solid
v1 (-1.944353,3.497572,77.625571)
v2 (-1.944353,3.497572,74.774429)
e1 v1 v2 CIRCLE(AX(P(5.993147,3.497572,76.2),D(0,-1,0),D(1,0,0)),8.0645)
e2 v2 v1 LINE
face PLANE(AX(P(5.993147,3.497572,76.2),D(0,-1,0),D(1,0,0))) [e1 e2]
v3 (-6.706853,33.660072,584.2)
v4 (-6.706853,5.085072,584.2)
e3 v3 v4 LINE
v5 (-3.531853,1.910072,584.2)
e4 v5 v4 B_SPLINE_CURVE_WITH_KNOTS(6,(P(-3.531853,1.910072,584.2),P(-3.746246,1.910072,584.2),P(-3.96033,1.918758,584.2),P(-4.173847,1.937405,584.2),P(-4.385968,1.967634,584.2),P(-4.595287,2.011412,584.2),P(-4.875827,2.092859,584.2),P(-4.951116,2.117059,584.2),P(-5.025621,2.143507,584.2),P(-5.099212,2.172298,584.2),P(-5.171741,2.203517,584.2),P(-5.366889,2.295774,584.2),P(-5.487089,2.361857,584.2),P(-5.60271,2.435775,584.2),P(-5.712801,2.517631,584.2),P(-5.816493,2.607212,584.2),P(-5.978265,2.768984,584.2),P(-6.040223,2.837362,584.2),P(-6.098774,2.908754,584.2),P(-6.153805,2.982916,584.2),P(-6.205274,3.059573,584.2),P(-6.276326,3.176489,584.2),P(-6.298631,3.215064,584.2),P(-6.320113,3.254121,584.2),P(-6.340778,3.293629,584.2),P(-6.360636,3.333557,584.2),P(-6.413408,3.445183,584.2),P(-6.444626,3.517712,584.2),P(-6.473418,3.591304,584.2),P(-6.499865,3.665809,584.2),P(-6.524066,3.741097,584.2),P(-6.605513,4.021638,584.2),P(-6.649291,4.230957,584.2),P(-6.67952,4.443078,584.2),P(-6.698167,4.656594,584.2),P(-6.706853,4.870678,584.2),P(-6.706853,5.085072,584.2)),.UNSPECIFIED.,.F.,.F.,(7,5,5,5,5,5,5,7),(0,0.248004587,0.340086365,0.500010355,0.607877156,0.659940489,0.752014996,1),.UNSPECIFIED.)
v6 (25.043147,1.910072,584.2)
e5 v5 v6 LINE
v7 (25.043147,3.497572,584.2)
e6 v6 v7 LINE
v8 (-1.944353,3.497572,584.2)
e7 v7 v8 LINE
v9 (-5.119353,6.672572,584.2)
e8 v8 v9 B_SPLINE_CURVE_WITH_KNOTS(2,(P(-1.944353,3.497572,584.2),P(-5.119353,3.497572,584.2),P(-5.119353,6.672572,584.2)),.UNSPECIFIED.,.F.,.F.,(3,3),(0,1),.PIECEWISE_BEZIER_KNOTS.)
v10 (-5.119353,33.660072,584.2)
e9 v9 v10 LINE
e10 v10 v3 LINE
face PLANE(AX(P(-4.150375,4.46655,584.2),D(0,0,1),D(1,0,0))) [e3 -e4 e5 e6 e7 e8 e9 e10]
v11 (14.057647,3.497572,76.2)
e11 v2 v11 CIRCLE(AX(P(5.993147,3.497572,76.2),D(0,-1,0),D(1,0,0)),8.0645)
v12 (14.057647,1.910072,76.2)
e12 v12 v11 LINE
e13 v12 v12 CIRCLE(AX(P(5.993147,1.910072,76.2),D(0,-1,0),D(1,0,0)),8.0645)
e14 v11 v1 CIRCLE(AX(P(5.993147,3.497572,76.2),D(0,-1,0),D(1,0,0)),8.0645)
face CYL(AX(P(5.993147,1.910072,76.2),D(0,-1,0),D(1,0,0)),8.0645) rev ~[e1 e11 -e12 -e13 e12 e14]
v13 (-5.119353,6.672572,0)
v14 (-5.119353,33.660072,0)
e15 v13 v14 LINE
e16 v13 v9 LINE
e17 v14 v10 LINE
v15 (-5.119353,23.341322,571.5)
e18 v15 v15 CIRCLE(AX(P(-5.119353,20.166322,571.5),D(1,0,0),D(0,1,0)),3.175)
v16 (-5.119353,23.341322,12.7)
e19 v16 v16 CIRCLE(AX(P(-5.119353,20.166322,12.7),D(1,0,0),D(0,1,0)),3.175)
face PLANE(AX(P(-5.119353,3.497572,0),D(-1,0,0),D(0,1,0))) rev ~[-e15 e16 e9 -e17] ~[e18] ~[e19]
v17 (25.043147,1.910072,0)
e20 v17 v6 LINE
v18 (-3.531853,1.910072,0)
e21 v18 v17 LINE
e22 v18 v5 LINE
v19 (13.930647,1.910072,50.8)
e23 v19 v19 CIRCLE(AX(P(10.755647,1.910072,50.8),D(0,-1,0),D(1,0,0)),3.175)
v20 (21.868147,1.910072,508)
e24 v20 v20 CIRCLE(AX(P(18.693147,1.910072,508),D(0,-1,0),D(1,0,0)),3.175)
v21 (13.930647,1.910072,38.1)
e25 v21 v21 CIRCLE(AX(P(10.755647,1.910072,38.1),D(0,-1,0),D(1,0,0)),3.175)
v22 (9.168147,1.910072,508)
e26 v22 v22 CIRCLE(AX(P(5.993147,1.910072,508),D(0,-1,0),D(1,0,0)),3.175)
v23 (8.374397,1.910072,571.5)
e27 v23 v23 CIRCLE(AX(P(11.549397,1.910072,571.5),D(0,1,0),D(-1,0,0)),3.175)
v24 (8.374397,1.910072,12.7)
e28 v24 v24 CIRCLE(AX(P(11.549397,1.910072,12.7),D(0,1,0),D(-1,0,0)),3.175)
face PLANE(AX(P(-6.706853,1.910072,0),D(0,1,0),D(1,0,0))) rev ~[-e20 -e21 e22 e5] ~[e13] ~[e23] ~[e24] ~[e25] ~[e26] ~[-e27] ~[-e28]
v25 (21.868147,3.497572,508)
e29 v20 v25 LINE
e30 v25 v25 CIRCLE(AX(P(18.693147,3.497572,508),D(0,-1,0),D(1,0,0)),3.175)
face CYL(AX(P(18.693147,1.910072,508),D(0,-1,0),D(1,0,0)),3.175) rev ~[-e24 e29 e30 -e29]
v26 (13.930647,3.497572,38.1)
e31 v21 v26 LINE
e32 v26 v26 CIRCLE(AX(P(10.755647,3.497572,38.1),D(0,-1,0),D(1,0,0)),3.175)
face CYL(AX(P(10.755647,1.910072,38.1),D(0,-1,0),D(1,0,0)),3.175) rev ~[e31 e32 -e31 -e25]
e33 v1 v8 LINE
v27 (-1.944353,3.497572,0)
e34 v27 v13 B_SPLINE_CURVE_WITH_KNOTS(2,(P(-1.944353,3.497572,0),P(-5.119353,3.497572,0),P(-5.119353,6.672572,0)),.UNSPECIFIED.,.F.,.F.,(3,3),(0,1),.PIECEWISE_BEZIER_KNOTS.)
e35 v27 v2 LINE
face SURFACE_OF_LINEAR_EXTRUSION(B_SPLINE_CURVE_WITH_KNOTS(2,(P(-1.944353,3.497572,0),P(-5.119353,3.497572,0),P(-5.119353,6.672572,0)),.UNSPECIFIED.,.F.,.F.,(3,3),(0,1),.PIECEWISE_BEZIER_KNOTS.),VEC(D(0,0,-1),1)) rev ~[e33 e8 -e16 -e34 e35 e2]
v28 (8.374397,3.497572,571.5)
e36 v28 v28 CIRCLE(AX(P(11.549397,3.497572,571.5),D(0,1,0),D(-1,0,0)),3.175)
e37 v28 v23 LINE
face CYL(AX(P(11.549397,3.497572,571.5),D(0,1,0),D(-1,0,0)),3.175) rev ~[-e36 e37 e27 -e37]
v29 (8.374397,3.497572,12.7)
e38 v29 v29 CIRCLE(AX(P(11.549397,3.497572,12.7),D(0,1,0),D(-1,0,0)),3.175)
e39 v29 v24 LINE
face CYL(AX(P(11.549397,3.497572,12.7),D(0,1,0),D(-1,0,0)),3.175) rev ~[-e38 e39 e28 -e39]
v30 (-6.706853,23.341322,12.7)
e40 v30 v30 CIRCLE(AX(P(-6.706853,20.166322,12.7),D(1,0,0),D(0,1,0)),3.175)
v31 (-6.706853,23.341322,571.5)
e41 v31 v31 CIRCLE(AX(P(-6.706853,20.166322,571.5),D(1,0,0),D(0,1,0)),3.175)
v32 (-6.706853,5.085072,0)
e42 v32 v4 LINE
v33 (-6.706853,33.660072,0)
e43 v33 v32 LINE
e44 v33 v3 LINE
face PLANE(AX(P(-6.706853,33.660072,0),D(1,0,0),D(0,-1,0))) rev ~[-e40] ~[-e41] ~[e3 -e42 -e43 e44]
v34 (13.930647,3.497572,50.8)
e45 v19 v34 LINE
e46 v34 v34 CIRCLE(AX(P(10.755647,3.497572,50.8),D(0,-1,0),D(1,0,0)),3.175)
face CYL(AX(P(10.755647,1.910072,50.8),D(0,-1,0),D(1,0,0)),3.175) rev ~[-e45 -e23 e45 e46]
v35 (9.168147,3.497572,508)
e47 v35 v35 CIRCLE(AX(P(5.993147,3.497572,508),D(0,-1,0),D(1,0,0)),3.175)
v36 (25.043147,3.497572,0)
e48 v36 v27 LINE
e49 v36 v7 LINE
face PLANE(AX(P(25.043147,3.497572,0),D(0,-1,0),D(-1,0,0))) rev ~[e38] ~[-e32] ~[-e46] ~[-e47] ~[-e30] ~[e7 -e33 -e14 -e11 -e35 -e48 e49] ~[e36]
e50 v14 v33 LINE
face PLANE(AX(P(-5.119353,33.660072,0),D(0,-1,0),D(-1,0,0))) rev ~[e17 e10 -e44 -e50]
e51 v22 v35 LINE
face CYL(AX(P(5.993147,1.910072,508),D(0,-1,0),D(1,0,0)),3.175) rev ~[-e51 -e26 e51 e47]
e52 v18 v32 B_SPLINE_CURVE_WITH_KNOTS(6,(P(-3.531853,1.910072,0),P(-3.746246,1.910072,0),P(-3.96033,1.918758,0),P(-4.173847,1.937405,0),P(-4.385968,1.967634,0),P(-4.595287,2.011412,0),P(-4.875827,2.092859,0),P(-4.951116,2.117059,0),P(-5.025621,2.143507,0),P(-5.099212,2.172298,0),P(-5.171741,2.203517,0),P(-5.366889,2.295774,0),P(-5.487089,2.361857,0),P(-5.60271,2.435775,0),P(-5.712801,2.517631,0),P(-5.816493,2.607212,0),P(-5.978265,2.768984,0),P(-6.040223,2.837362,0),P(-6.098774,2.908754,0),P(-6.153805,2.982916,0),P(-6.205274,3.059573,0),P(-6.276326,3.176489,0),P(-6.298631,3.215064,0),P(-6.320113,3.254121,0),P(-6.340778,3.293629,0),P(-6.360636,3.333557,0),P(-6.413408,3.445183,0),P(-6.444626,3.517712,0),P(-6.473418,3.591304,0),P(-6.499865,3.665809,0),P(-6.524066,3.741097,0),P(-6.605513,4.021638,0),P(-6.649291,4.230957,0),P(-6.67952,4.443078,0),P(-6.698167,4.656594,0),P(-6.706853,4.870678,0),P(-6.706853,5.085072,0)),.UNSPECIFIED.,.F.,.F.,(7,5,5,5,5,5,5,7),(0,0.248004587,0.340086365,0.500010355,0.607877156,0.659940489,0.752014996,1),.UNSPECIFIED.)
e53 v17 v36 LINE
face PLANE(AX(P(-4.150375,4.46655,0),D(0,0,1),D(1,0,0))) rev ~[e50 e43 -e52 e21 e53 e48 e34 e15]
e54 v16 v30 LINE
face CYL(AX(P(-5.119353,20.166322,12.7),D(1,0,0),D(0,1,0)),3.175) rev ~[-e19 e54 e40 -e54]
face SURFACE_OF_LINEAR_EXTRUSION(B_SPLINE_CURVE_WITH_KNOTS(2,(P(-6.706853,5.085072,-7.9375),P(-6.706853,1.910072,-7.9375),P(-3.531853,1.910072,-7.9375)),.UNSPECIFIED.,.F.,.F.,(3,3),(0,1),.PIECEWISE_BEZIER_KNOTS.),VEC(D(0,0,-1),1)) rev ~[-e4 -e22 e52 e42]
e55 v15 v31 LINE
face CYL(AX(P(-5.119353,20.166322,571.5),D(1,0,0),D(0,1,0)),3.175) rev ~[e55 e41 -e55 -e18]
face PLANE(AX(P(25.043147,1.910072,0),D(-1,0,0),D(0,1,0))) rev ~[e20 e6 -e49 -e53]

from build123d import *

# Parameters (mm, degrees)
F1_DEPTH    = 584.2
F2_T1_DEPTH = 584.2
F2_T3_DEPTH = 600.075
F3_R        = 3.175
F4_DEPTH    = 1.5875
F5_R        = 3.175
F6_DEPTH    = 1.5875
F7_R        = 3.175
F8_DEPTH    = 1.5875
F9_R        = 3.175
F10_DEPTH   = 1.5875
F11_R       = 8.0645
F12_DEPTH   = 1.5875


# Not quite as in the source:
# - a fillet or chamfer that OpenCascade refuses, or shapes differently, is made with other operations: its cross-section is extruded or revolved along the edge and cut away or added


with BuildPart() as f1:
    # F0 (on Top) → F1 (new body)
    with BuildSketch(Plane.XY):
        Polygon((-5.119352553, 3.4975720825), (-5.119352553, 33.6600720825), (-6.706852553, 33.6600720825), (-6.706852553, 1.9100720825), (25.043147447, 1.9100720825), (25.043147447, 3.4975720825), align=None)
    extrude(amount=F1_DEPTH)

    # F2: fillet of radius 3.175 on 2 edges, made by hand

    # F2_s2 → F2_t1 (join)
    with BuildSketch(Plane.XY):
        with BuildLine():
            add(Edge.make_bspline(
                [(-1.944352553, 3.4975720825), (-5.119352553, 3.4975720825), (-5.119352553, 6.6725720825)],
                knots=[0, 0, 0, 1, 1, 1], degree=2, weights=[1, 1, 1]))
            Line((-5.119352553, 6.6725720825), (-5.119352553, 3.4975720825))
            Line((-5.119352553, 3.4975720825), (-1.944352553, 3.4975720825))
        make_face()
    extrude(amount=F2_T1_DEPTH)

    # F2_s4 → F2_t3 (cut)
    with BuildSketch(Plane.XY.offset(-7.9375)):
        with BuildLine():
            add(Edge.make_bspline(
                [(-6.706852553, 5.0850720825), (-6.706852553, 1.9100720825), (-3.531852553, 1.9100720825)],
                knots=[0, 0, 0, 1, 1, 1], degree=2, weights=[1, 1, 1]))
            Line((-3.531852553, 1.9100720825), (-6.706852553, 1.9100720825))
            Line((-6.706852553, 1.9100720825), (-6.706852553, 5.0850720825))
        make_face()
    extrude(amount=F2_T3_DEPTH, mode=Mode.SUBTRACT)

    # F3 (on face) → F4 (cut)
    with BuildSketch(Plane.YZ.offset(-5.119352553)):
        with Locations((20.1663220825, 12.7)):
            Circle(F3_R)
        with Locations((20.1663220825, 571.5)):
            Circle(F3_R)
    extrude(amount=-F4_DEPTH, mode=Mode.SUBTRACT)

    # F5 (on face) → F6 (cut)
    with BuildSketch(Plane(origin=(0, 3.4975720825, 0), x_dir=(-1, 0, 0), z_dir=(0, 1, 0))):
        with Locations((-11.549397447, 12.7)):
            Circle(F5_R)
        with Locations((-11.549397447, 571.5)):
            Circle(F5_R)
    extrude(amount=-F6_DEPTH, mode=Mode.SUBTRACT)

    # F7 (on face) → F8 (cut)
    with BuildSketch(Plane.XZ.offset(-1.9100720825)):
        with Locations((5.993147447, 508)):
            Circle(F7_R)
        with Locations((18.693147447, 508)):
            Circle(F7_R)
    extrude(amount=-F8_DEPTH, mode=Mode.SUBTRACT)

    # F9 (on face) → F10 (cut)
    with BuildSketch(Plane.XZ.offset(-1.9100720825)):
        with Locations((10.755647447, 38.1)):
            Circle(F9_R)
        with Locations((10.755647447, 50.8)):
            Circle(F9_R)
    extrude(amount=-F10_DEPTH, mode=Mode.SUBTRACT)

    # F11 (on face) → F12 (cut)
    with BuildSketch(Plane.XZ.offset(-1.9100720825)):
        with Locations((5.993147447, 76.2)):
            Circle(F11_R)
    extrude(amount=-F12_DEPTH, mode=Mode.SUBTRACT)


solid = f1.part
